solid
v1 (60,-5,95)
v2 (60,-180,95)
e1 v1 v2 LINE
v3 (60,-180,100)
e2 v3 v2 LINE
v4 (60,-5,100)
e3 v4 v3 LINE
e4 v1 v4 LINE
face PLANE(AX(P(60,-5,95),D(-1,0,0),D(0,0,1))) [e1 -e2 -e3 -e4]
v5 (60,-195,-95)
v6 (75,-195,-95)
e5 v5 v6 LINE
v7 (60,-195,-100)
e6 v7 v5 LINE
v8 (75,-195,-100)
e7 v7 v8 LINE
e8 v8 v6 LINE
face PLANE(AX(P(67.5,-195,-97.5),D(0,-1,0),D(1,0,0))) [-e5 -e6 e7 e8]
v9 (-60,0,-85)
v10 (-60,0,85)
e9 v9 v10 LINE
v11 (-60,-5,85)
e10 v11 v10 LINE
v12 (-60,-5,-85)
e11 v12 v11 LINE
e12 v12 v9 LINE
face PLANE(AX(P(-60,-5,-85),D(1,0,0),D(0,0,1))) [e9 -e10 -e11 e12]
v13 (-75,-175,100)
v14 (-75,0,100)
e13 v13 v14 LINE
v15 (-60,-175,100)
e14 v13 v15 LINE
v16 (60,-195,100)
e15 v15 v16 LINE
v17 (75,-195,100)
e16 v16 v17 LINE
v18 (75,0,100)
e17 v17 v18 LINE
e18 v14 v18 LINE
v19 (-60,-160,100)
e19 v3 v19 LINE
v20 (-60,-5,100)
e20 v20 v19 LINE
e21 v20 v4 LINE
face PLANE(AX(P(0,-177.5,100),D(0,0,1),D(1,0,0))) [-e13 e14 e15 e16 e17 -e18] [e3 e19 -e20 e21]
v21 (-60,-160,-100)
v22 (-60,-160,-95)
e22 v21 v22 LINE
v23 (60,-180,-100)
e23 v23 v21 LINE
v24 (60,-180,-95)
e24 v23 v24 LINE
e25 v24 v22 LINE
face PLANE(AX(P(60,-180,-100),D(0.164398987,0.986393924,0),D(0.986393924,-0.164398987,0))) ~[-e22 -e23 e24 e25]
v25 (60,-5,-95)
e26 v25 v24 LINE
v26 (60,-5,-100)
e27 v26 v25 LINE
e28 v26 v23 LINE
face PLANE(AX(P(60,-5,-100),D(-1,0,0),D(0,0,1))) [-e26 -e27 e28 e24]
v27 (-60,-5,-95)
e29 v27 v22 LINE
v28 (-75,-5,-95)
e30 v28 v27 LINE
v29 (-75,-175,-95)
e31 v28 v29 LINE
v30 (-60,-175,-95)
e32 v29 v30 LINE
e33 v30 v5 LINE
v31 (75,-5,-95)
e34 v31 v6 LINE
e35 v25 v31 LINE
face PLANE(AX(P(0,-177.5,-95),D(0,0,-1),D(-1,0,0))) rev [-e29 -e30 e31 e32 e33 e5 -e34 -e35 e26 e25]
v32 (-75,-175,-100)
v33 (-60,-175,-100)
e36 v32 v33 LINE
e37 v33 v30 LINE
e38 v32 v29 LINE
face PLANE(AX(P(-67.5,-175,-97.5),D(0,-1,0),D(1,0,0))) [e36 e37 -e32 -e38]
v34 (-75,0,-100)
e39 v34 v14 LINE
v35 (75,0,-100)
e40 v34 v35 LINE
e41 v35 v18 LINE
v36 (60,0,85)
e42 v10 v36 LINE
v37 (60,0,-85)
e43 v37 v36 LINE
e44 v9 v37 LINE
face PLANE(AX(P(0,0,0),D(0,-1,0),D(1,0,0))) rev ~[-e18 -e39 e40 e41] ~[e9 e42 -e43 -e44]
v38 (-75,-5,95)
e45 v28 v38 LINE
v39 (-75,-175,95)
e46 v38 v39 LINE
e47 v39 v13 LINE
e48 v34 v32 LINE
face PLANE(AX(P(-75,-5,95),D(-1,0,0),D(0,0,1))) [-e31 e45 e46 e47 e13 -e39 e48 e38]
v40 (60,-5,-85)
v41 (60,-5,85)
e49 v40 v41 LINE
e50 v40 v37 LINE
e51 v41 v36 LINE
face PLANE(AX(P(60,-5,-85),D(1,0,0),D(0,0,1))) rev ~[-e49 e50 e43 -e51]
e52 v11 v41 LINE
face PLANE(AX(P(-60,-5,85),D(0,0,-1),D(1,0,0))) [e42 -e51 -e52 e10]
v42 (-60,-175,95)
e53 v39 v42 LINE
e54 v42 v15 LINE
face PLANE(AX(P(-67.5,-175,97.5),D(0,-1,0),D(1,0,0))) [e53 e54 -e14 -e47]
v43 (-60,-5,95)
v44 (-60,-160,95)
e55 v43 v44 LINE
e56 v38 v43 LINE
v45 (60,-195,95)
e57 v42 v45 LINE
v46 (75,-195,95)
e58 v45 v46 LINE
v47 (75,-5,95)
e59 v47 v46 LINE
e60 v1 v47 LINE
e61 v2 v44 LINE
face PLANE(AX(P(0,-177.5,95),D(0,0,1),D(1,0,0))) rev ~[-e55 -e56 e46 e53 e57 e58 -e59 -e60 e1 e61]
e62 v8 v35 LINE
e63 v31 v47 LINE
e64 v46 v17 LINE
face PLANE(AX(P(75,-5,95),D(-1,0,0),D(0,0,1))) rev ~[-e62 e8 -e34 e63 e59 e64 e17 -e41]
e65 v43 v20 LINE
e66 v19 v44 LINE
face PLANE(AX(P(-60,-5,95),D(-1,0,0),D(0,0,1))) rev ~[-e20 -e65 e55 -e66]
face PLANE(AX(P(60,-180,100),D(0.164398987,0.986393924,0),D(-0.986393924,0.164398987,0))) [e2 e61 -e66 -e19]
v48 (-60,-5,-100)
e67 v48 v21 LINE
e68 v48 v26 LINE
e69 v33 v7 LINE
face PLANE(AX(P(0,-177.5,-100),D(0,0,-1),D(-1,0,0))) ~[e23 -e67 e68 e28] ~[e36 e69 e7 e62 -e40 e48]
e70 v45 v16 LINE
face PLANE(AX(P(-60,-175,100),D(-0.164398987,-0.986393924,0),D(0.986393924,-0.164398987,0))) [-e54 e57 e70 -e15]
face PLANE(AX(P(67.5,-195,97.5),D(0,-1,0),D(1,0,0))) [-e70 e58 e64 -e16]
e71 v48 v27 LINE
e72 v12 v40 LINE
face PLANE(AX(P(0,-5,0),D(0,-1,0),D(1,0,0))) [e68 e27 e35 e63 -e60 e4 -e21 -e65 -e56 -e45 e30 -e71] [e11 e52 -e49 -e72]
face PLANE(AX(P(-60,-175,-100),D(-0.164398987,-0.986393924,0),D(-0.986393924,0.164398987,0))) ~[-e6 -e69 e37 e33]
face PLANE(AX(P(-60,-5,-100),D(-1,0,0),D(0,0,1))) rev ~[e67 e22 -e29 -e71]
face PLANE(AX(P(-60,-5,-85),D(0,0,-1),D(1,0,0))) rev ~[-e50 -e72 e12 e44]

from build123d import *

# Parameters (mm, degrees)
F0_W      = 150
F0_H      = 200
F1_DEPTH  = 5
F2_W      = 15
F2_H      = 5
F3_DEPTH  = 190
F4_W      = 15
F4_H      = 5
F5_DEPTH  = 170
F7_DEPTH  = 5
F9_W      = 120
F9_H      = 170
F10_DEPTH = 25


with BuildPart() as f1:
    # F0 (on Front) → F1 (new body)
    with BuildSketch(Plane.XZ):
        Rectangle(F0_W, F0_H)
    extrude(amount=F1_DEPTH)

    # F2 (on face) → F3 (join)
    with BuildSketch(Plane.XZ.offset(5)):
        with Locations((67.5, 97.5)):
            Rectangle(F2_W, F2_H)
        with Locations((67.5, -97.5)):
            Rectangle(F2_W, F2_H)
    extrude(amount=F3_DEPTH)

    # F4 (on face) → F5 (join)
    with BuildSketch(Plane.XZ.offset(5)):
        with Locations((-67.5, 97.5)):
            Rectangle(F4_W, F4_H)
        with Locations((-67.5, -97.5)):
            Rectangle(F4_W, F4_H)
    extrude(amount=F5_DEPTH)

    # F6 (on face) → F7 (join)
    with BuildSketch(Plane.XY.offset(100)):
        Polygon((-60, -160), (-60, -175), (60, -195), (60, -180), align=None)
    extrude(amount=-F7_DEPTH)

    # F8: F1 across plane


with BuildPart() as f1_1:
    add(f1.part)
    add(f1.part.mirror(Plane.XY))

    # F9 (on face) → F10 (cut)
    with BuildSketch(Plane.XZ.offset(5)):
        Rectangle(F9_W, F9_H)
    extrude(amount=-F10_DEPTH, mode=Mode.SUBTRACT)


solid = f1_1.part
